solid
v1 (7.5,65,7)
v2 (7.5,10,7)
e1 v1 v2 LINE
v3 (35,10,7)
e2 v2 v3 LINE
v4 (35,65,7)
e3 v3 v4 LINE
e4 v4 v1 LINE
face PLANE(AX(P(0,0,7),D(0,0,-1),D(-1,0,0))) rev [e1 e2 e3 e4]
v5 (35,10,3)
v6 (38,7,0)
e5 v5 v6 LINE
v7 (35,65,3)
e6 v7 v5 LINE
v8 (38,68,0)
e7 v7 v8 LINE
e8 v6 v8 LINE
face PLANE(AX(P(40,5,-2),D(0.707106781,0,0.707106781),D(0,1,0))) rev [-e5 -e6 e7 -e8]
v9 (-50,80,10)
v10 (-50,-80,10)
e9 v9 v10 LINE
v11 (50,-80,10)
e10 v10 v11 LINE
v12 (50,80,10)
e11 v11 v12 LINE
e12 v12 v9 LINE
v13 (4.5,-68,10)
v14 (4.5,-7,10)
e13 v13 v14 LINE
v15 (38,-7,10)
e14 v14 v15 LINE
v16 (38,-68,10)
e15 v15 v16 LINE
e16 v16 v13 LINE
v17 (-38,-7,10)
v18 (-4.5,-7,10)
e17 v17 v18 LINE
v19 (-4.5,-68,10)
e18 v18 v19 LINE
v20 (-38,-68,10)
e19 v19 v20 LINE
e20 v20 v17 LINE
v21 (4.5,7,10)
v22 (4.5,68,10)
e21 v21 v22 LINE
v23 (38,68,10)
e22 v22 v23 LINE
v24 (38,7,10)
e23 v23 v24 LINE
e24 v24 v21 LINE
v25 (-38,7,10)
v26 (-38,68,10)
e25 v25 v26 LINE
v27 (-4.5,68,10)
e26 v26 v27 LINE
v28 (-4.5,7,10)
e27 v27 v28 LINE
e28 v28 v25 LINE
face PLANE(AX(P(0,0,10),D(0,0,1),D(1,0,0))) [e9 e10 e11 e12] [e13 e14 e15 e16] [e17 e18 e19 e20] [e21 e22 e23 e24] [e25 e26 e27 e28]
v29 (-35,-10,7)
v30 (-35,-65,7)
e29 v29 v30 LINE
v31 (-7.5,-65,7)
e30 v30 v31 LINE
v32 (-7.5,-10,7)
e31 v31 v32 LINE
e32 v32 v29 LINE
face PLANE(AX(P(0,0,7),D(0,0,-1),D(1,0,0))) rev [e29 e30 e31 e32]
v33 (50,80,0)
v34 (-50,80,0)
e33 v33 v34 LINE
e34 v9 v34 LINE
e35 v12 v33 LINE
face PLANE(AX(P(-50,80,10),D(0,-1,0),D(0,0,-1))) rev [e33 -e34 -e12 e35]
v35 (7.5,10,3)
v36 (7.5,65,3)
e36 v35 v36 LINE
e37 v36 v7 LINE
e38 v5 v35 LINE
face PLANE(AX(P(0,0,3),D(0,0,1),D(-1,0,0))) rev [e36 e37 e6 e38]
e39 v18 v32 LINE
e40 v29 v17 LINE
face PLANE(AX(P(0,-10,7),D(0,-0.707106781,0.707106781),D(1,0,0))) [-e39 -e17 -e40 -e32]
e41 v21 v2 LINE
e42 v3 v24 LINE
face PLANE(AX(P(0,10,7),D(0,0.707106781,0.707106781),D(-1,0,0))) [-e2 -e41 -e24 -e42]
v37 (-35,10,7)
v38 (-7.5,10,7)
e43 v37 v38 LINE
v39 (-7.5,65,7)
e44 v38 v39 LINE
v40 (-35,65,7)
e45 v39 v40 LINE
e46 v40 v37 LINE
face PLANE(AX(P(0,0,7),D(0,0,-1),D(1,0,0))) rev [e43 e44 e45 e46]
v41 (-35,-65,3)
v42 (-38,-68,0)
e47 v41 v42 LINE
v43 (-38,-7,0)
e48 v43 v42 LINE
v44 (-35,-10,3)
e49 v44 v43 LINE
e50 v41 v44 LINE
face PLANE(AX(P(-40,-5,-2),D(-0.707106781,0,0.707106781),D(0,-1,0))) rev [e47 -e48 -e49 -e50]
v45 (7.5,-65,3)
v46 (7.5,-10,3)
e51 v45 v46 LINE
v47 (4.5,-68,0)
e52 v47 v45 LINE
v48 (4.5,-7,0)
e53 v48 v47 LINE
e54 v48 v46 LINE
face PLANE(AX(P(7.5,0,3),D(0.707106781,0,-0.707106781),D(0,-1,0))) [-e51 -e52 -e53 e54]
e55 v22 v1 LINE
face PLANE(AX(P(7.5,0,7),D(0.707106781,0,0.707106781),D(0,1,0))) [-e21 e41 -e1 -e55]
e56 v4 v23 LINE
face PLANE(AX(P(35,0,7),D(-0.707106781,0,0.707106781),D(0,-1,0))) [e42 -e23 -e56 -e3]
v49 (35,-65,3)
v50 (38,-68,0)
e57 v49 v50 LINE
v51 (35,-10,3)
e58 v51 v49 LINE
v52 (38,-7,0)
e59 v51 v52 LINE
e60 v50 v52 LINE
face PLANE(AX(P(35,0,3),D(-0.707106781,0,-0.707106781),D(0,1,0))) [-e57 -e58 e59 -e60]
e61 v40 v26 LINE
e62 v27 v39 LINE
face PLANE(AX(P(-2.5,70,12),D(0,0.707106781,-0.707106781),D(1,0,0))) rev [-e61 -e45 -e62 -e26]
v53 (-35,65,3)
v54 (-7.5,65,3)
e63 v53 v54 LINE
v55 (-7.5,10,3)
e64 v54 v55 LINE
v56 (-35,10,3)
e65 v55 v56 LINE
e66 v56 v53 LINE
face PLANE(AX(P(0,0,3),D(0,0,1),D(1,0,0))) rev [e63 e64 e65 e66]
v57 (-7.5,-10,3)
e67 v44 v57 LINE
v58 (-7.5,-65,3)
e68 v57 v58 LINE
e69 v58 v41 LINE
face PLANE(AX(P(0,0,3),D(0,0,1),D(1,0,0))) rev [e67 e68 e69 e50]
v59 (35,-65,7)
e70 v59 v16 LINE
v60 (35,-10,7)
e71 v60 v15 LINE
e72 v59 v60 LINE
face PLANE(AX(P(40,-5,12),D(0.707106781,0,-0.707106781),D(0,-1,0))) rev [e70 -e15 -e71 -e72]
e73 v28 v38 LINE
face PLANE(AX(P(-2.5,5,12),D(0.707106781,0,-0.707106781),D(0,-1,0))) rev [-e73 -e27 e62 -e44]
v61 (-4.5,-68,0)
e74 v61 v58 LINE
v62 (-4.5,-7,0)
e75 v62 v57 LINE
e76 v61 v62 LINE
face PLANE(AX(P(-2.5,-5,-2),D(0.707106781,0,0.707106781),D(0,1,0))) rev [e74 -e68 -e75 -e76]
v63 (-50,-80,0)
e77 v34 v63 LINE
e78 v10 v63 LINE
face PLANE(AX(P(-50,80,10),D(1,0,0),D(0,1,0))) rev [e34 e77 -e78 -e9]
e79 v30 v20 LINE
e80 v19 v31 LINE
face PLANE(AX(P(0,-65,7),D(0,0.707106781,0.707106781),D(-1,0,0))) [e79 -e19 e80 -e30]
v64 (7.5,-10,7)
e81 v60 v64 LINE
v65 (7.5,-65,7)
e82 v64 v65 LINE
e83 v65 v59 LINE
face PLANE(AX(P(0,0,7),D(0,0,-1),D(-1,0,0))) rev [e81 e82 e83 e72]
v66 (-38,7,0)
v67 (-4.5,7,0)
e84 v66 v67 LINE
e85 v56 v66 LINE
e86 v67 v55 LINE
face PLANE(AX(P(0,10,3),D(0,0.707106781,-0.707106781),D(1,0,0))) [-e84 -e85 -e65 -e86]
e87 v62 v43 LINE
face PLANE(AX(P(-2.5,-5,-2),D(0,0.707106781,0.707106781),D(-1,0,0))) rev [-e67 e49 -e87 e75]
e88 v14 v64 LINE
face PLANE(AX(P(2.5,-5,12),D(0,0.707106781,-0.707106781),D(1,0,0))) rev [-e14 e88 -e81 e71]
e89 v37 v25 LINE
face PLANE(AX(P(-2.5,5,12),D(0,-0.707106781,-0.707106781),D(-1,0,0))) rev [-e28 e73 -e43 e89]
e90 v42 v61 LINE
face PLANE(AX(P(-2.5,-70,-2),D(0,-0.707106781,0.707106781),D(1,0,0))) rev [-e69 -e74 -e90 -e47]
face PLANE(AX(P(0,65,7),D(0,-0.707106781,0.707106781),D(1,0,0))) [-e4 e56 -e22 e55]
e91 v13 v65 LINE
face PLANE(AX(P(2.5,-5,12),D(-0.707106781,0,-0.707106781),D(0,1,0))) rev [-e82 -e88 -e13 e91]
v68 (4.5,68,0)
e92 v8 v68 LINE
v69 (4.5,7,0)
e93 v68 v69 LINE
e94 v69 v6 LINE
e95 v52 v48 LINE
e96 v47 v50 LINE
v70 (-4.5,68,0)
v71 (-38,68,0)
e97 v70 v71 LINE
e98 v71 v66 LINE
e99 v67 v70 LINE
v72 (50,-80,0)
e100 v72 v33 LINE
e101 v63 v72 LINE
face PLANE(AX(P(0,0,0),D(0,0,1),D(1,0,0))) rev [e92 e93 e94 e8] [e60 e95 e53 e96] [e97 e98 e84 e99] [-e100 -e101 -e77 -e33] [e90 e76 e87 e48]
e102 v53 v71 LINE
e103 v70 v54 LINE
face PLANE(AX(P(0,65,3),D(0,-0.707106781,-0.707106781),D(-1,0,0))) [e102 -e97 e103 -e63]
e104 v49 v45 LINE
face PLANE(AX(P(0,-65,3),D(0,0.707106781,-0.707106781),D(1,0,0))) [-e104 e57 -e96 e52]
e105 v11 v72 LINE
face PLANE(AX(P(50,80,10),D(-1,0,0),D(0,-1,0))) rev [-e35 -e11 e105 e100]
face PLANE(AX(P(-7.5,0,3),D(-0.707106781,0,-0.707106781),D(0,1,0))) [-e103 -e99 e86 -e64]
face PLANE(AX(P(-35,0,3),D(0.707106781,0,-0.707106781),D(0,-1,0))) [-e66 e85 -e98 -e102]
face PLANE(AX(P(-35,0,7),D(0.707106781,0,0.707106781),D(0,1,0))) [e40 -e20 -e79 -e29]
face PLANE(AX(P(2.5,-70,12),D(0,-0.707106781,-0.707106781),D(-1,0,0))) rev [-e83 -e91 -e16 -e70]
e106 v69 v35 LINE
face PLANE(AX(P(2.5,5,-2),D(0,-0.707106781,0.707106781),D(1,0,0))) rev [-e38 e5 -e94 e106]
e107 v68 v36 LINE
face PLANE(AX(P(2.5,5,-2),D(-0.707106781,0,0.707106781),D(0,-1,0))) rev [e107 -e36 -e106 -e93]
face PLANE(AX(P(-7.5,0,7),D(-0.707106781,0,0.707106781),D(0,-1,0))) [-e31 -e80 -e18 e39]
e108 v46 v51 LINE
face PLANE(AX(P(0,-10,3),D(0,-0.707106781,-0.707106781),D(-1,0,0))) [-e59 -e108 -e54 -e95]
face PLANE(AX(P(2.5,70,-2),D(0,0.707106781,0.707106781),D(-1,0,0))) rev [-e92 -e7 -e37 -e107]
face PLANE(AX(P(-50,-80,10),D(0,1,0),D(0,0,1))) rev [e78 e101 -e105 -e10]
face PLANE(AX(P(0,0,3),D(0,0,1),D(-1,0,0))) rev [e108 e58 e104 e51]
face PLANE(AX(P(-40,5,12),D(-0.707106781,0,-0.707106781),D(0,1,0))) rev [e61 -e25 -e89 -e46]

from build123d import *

# Parameters (mm, degrees)
SKETCH1_W               = 100
SKETCH1_H               = 160
BOSS_EXTRUDE1_DEPTH     = 10
SKETCH2_W               = 37.5
SKETCH2_H               = 65
CUT_EXTRUDE1_DEPTH      = 3
MIRROR6_COPY_1_SKETCH_W = 37.5
MIRROR6_COPY_1_SKETCH_H = 65
MIRROR6_COPY_1_DEPTH    = 3
MIRROR7_COPY_1_SKETCH_W = 37.5
MIRROR7_COPY_1_SKETCH_H = 65
MIRROR7_COPY_1_DEPTH    = 3
MIRROR7_COPY_2_SKETCH_W = 37.5
MIRROR7_COPY_2_SKETCH_H = 65
MIRROR7_COPY_2_DEPTH    = 3
MIRROR7_COPY_3_SKETCH_W = 37.5
MIRROR7_COPY_3_SKETCH_H = 65
MIRROR7_COPY_3_DEPTH    = 3
CHAMFER2_SIZE           = 5


with BuildPart() as part:
    # Sketch1 → Boss-Extrude1 (new body)
    with BuildSketch(Plane.XY):
        Rectangle(SKETCH1_W, SKETCH1_H)
    extrude(amount=BOSS_EXTRUDE1_DEPTH)

    # Sketch2 → Cut-Extrude1 (cut)
    with BuildSketch(Plane.XY.offset(10)):
        with Locations((21.25, 37.5)):
            Rectangle(SKETCH2_W, SKETCH2_H)
    cut_extrude1 = extrude(amount=-CUT_EXTRUDE1_DEPTH, mode=Mode.SUBTRACT)

    # Mirror5: Cut-Extrude1 across plane
    add(cut_extrude1.mirror(Plane.ZX), mode=Mode.SUBTRACT)

    # Mirror6: Cut-Extrude1 across plane
    add(cut_extrude1.mirror(Plane(origin=(0, 0, 0), x_dir=(0, 0, 1), z_dir=(1, 0, 0))), mode=Mode.SUBTRACT)

    # Mirror6 copy 1 sketch → Mirror6 copy 1 (cut)
    with BuildSketch(Plane(origin=(0, 0, 10), x_dir=(-1, 0, 0), z_dir=(0, 0, 1))):
        with Locations((21.25, 37.5)):
            Rectangle(MIRROR6_COPY_1_SKETCH_W, MIRROR6_COPY_1_SKETCH_H)
    extrude(amount=-MIRROR6_COPY_1_DEPTH, mode=Mode.SUBTRACT)

    # Mirror7: Cut-Extrude1 across plane
    add(cut_extrude1.mirror(Plane.XY.offset(5)), mode=Mode.SUBTRACT)

    # Mirror7 copy 1 sketch → Mirror7 copy 1 (cut)
    with BuildSketch(Plane(origin=(0, 0, 0), x_dir=(1, 0, 0), z_dir=(0, 0, -1))):
        with Locations((21.25, 37.5)):
            Rectangle(MIRROR7_COPY_1_SKETCH_W, MIRROR7_COPY_1_SKETCH_H)
    extrude(amount=-MIRROR7_COPY_1_DEPTH, mode=Mode.SUBTRACT)

    # Mirror7 copy 2 sketch → Mirror7 copy 2 (cut)
    with BuildSketch(Plane(origin=(0, 0, 0), x_dir=(-1, 0, 0), z_dir=(0, 0, -1))):
        with Locations((21.25, 37.5)):
            Rectangle(MIRROR7_COPY_2_SKETCH_W, MIRROR7_COPY_2_SKETCH_H)
    extrude(amount=-MIRROR7_COPY_2_DEPTH, mode=Mode.SUBTRACT)

    # Mirror7 copy 3 sketch → Mirror7 copy 3 (cut)
    with BuildSketch(Plane(origin=(0, 0, 0), x_dir=(-1, 0, 0), z_dir=(0, 0, -1))):
        with Locations((21.25, -37.5)):
            Rectangle(MIRROR7_COPY_3_SKETCH_W, MIRROR7_COPY_3_SKETCH_H)
    extrude(amount=-MIRROR7_COPY_3_DEPTH, mode=Mode.SUBTRACT)

    # Chamfer2
    # the kernel refuses this chamfer: 5 mm, written as the material it adds along each edge
    with BuildSketch(Plane(origin=(10.35841494, -5, 3), x_dir=(0, 0.027495876610586317, -0.9996219169112968), z_dir=(-1, 0, 0))) as chamfer2_piece_1_section:
        Polygon((CHAMFER2_SIZE * 0.999621916911, CHAMFER2_SIZE * 0.0274958766106), (-CHAMFER2_SIZE * 0.0274958766106, CHAMFER2_SIZE * 0.999621916911), (0, 0), align=None)
    chamfer2_piece_1 = extrude(amount=50.35841494, mode=Mode.PRIVATE)
    chamfer2_piece_1 = split(chamfer2_piece_1, bisect_by=Plane(origin=(6.42920747, -6.857142857, 0), z_dir=(0, 0, 1)), keep=Keep.TOP, mode=Mode.PRIVATE)
    add(chamfer2_piece_1)
    with BuildSketch(Plane(origin=(-40, 7.85841494, 3), x_dir=(-0.027495876610586317, 0, -0.9996219169112968), z_dir=(0, -1, 0))) as chamfer2_piece_2_section:
        Polygon((CHAMFER2_SIZE * 0.999621916911, CHAMFER2_SIZE * 0.0274958766106), (-CHAMFER2_SIZE * 0.0274958766106, CHAMFER2_SIZE * 0.999621916911), (0, 0), align=None)
    chamfer2_piece_2 = extrude(amount=77.85841494, mode=Mode.PRIVATE)
    chamfer2_piece_2 = split(chamfer2_piece_2, bisect_by=Plane(origin=(-38.142857143, 6.42920747, 0), z_dir=(0, 0, 1)), keep=Keep.TOP, mode=Mode.PRIVATE)
    add(chamfer2_piece_2)
    with BuildSketch(Plane(origin=(-40, -70, 3), x_dir=(0, -0.0274958766105877, -0.9996219169112968), z_dir=(1, 0, 0))) as chamfer2_piece_3_section:
        Polygon((CHAMFER2_SIZE * 0.999621916911, CHAMFER2_SIZE * 0.0274958766106), (-CHAMFER2_SIZE * 0.0274958766106, CHAMFER2_SIZE * 0.999621916911), (0, 0), align=None)
    chamfer2_piece_3 = extrude(amount=50.35841494, mode=Mode.PRIVATE)
    chamfer2_piece_3 = split(chamfer2_piece_3, bisect_by=Plane(origin=(-21.25, -68.142857143, 0), z_dir=(0, 0, 1)), keep=Keep.TOP, mode=Mode.PRIVATE)
    add(chamfer2_piece_3)
    with BuildSketch(Plane(origin=(-2.5, -70, 3), x_dir=(0.027495876610586403, 0, -0.9996219169112968), z_dir=(0, 1, 0))) as chamfer2_piece_4_section:
        Polygon((CHAMFER2_SIZE * 0.999621916911, CHAMFER2_SIZE * 0.0274958766106), (-CHAMFER2_SIZE * 0.0274958766106, CHAMFER2_SIZE * 0.999621916911), (0, 0), align=None)
    chamfer2_piece_4 = extrude(amount=77.85841494, mode=Mode.PRIVATE)
    chamfer2_piece_4 = split(chamfer2_piece_4, bisect_by=Plane(origin=(-4.357142857, -37.5, 0), z_dir=(0, 0, 1)), keep=Keep.TOP, mode=Mode.PRIVATE)
    add(chamfer2_piece_4)
    with BuildSketch(Plane(origin=(-40, -70, 7), x_dir=(0, -0.0274958766105877, 0.9996219169112968), z_dir=(1, 0, 0))) as chamfer2_piece_5_section:
        Polygon((CHAMFER2_SIZE * 0.999621916911, -CHAMFER2_SIZE * 0.0274958766106), (-CHAMFER2_SIZE * 0.0274958766106, -CHAMFER2_SIZE * 0.999621916911), (0, 0), align=None)
    chamfer2_piece_5 = extrude(amount=50.35841494, mode=Mode.PRIVATE)
    chamfer2_piece_5 = split(chamfer2_piece_5, bisect_by=Plane(origin=(-21.25, -68.142857143, 10), z_dir=(0, 0, -1)), keep=Keep.TOP, mode=Mode.PRIVATE)
    add(chamfer2_piece_5)
    with BuildSketch(Plane(origin=(-40, 7.85841494, 7), x_dir=(-0.027495876610586317, 0, 0.9996219169112968), z_dir=(0, -1, 0))) as chamfer2_piece_6_section:
        Polygon((CHAMFER2_SIZE * 0.999621916911, -CHAMFER2_SIZE * 0.0274958766106), (-CHAMFER2_SIZE * 0.0274958766106, -CHAMFER2_SIZE * 0.999621916911), (0, 0), align=None)
    chamfer2_piece_6 = extrude(amount=77.85841494, mode=Mode.PRIVATE)
    chamfer2_piece_6 = split(chamfer2_piece_6, bisect_by=Plane(origin=(-38.142857143, 6.42920747, 10), z_dir=(0, 0, -1)), keep=Keep.TOP, mode=Mode.PRIVATE)
    add(chamfer2_piece_6)
    with BuildSketch(Plane(origin=(10.35841494, -5, 7), x_dir=(0, 0.027495876610586317, 0.9996219169112968), z_dir=(-1, 0, 0))) as chamfer2_piece_7_section:
        Polygon((CHAMFER2_SIZE * 0.999621916911, -CHAMFER2_SIZE * 0.0274958766106), (-CHAMFER2_SIZE * 0.0274958766106, -CHAMFER2_SIZE * 0.999621916911), (0, 0), align=None)
    chamfer2_piece_7 = extrude(amount=50.35841494, mode=Mode.PRIVATE)
    chamfer2_piece_7 = split(chamfer2_piece_7, bisect_by=Plane(origin=(6.42920747, -6.857142857, 10), z_dir=(0, 0, -1)), keep=Keep.TOP, mode=Mode.PRIVATE)
    add(chamfer2_piece_7)
    with BuildSketch(Plane(origin=(-2.5, -70, 7), x_dir=(0.027495876610586403, 0, 0.9996219169112968), z_dir=(0, 1, 0))) as chamfer2_piece_8_section:
        Polygon((CHAMFER2_SIZE * 0.999621916911, -CHAMFER2_SIZE * 0.0274958766106), (-CHAMFER2_SIZE * 0.0274958766106, -CHAMFER2_SIZE * 0.999621916911), (0, 0), align=None)
    chamfer2_piece_8 = extrude(amount=77.85841494, mode=Mode.PRIVATE)
    chamfer2_piece_8 = split(chamfer2_piece_8, bisect_by=Plane(origin=(-4.357142857, -37.5, 10), z_dir=(0, 0, -1)), keep=Keep.TOP, mode=Mode.PRIVATE)
    add(chamfer2_piece_8)
    with BuildSketch(Plane(origin=(-10.35841494, 5, 3), x_dir=(0, -0.027495876610586317, -0.9996219169112968), z_dir=(1, 0, 0))) as chamfer2_piece_9_section:
        Polygon((CHAMFER2_SIZE * 0.999621916911, CHAMFER2_SIZE * 0.0274958766106), (-CHAMFER2_SIZE * 0.0274958766106, CHAMFER2_SIZE * 0.999621916911), (0, 0), align=None)
    chamfer2_piece_9 = extrude(amount=50.35841494, mode=Mode.PRIVATE)
    chamfer2_piece_9 = split(chamfer2_piece_9, bisect_by=Plane(origin=(-6.42920747, 6.857142857, 0), z_dir=(0, 0, 1)), keep=Keep.TOP, mode=Mode.PRIVATE)
    add(chamfer2_piece_9)
    with BuildSketch(Plane(origin=(40, -7.85841494, 3), x_dir=(0.027495876610586317, 0, -0.9996219169112968), z_dir=(0, 1, 0))) as chamfer2_piece_10_section:
        Polygon((CHAMFER2_SIZE * 0.999621916911, CHAMFER2_SIZE * 0.0274958766106), (-CHAMFER2_SIZE * 0.0274958766106, CHAMFER2_SIZE * 0.999621916911), (0, 0), align=None)
    chamfer2_piece_10 = extrude(amount=77.85841494, mode=Mode.PRIVATE)
    chamfer2_piece_10 = split(chamfer2_piece_10, bisect_by=Plane(origin=(38.142857143, -6.42920747, 0), z_dir=(0, 0, 1)), keep=Keep.TOP, mode=Mode.PRIVATE)
    add(chamfer2_piece_10)
    with BuildSketch(Plane(origin=(40, 70, 3), x_dir=(0, 0.0274958766105877, -0.9996219169112968), z_dir=(-1, 0, 0))) as chamfer2_piece_11_section:
        Polygon((CHAMFER2_SIZE * 0.999621916911, CHAMFER2_SIZE * 0.0274958766106), (-CHAMFER2_SIZE * 0.0274958766106, CHAMFER2_SIZE * 0.999621916911), (0, 0), align=None)
    chamfer2_piece_11 = extrude(amount=50.35841494, mode=Mode.PRIVATE)
    chamfer2_piece_11 = split(chamfer2_piece_11, bisect_by=Plane(origin=(21.25, 68.142857143, 0), z_dir=(0, 0, 1)), keep=Keep.TOP, mode=Mode.PRIVATE)
    add(chamfer2_piece_11)
    with BuildSketch(Plane(origin=(2.5, 70, 3), x_dir=(-0.027495876610586403, 0, -0.9996219169112968), z_dir=(0, -1, 0))) as chamfer2_piece_12_section:
        Polygon((CHAMFER2_SIZE * 0.999621916911, CHAMFER2_SIZE * 0.0274958766106), (-CHAMFER2_SIZE * 0.0274958766106, CHAMFER2_SIZE * 0.999621916911), (0, 0), align=None)
    chamfer2_piece_12 = extrude(amount=77.85841494, mode=Mode.PRIVATE)
    chamfer2_piece_12 = split(chamfer2_piece_12, bisect_by=Plane(origin=(4.357142857, 37.5, 0), z_dir=(0, 0, 1)), keep=Keep.TOP, mode=Mode.PRIVATE)
    add(chamfer2_piece_12)
    with BuildSketch(Plane(origin=(-40, 70, 3), x_dir=(0, 0.0274958766105877, -0.9996219169112968), z_dir=(1, 0, 0))) as chamfer2_piece_13_section:
        Polygon((CHAMFER2_SIZE * 0.999621916911, -CHAMFER2_SIZE * 0.0274958766106), (-CHAMFER2_SIZE * 0.0274958766106, -CHAMFER2_SIZE * 0.999621916911), (0, 0), align=None)
    chamfer2_piece_13 = extrude(amount=50.35841494, mode=Mode.PRIVATE)
    chamfer2_piece_13 = split(chamfer2_piece_13, bisect_by=Plane(origin=(-21.25, 68.142857143, 0), z_dir=(0, 0, 1)), keep=Keep.TOP, mode=Mode.PRIVATE)
    add(chamfer2_piece_13)
    with BuildSketch(Plane(origin=(-40, -7.85841494, 3), x_dir=(-0.027495876610586317, 0, -0.9996219169112968), z_dir=(0, 1, 0))) as chamfer2_piece_14_section:
        Polygon((CHAMFER2_SIZE * 0.999621916911, -CHAMFER2_SIZE * 0.0274958766106), (-CHAMFER2_SIZE * 0.0274958766106, -CHAMFER2_SIZE * 0.999621916911), (0, 0), align=None)
    chamfer2_piece_14 = extrude(amount=77.85841494, mode=Mode.PRIVATE)
    chamfer2_piece_14 = split(chamfer2_piece_14, bisect_by=Plane(origin=(-38.142857143, -6.42920747, 0), z_dir=(0, 0, 1)), keep=Keep.TOP, mode=Mode.PRIVATE)
    add(chamfer2_piece_14)
    with BuildSketch(Plane(origin=(10.35841494, 5, 3), x_dir=(0, -0.027495876610586317, -0.9996219169112968), z_dir=(-1, 0, 0))) as chamfer2_piece_15_section:
        Polygon((CHAMFER2_SIZE * 0.999621916911, -CHAMFER2_SIZE * 0.0274958766106), (-CHAMFER2_SIZE * 0.0274958766106, -CHAMFER2_SIZE * 0.999621916911), (0, 0), align=None)
    chamfer2_piece_15 = extrude(amount=50.35841494, mode=Mode.PRIVATE)
    chamfer2_piece_15 = split(chamfer2_piece_15, bisect_by=Plane(origin=(6.42920747, 6.857142857, 0), z_dir=(0, 0, 1)), keep=Keep.TOP, mode=Mode.PRIVATE)
    add(chamfer2_piece_15)
    with BuildSketch(Plane(origin=(-2.5, 70, 3), x_dir=(0.027495876610586403, 0, -0.9996219169112968), z_dir=(0, -1, 0))) as chamfer2_piece_16_section:
        Polygon((CHAMFER2_SIZE * 0.999621916911, -CHAMFER2_SIZE * 0.0274958766106), (-CHAMFER2_SIZE * 0.0274958766106, -CHAMFER2_SIZE * 0.999621916911), (0, 0), align=None)
    chamfer2_piece_16 = extrude(amount=77.85841494, mode=Mode.PRIVATE)
    chamfer2_piece_16 = split(chamfer2_piece_16, bisect_by=Plane(origin=(-4.357142857, 37.5, 0), z_dir=(0, 0, 1)), keep=Keep.TOP, mode=Mode.PRIVATE)
    add(chamfer2_piece_16)
    with BuildSketch(Plane(origin=(40, -70, 3), x_dir=(0, -0.0274958766105877, -0.9996219169112968), z_dir=(-1, 0, 0))) as chamfer2_piece_17_section:
        Polygon((CHAMFER2_SIZE * 0.999621916911, -CHAMFER2_SIZE * 0.0274958766106), (-CHAMFER2_SIZE * 0.0274958766106, -CHAMFER2_SIZE * 0.999621916911), (0, 0), align=None)
    chamfer2_piece_17 = extrude(amount=50.35841494, mode=Mode.PRIVATE)
    chamfer2_piece_17 = split(chamfer2_piece_17, bisect_by=Plane(origin=(21.25, -68.142857143, 0), z_dir=(0, 0, 1)), keep=Keep.TOP, mode=Mode.PRIVATE)
    add(chamfer2_piece_17)
    with BuildSketch(Plane(origin=(40, 7.85841494, 3), x_dir=(0.027495876610586317, 0, -0.9996219169112968), z_dir=(0, -1, 0))) as chamfer2_piece_18_section:
        Polygon((CHAMFER2_SIZE * 0.999621916911, -CHAMFER2_SIZE * 0.0274958766106), (-CHAMFER2_SIZE * 0.0274958766106, -CHAMFER2_SIZE * 0.999621916911), (0, 0), align=None)
    chamfer2_piece_18 = extrude(amount=77.85841494, mode=Mode.PRIVATE)
    chamfer2_piece_18 = split(chamfer2_piece_18, bisect_by=Plane(origin=(38.142857143, 6.42920747, 0), z_dir=(0, 0, 1)), keep=Keep.TOP, mode=Mode.PRIVATE)
    add(chamfer2_piece_18)
    with BuildSketch(Plane(origin=(-10.35841494, -5, 3), x_dir=(0, 0.027495876610586317, -0.9996219169112968), z_dir=(1, 0, 0))) as chamfer2_piece_19_section:
        Polygon((CHAMFER2_SIZE * 0.999621916911, -CHAMFER2_SIZE * 0.0274958766106), (-CHAMFER2_SIZE * 0.0274958766106, -CHAMFER2_SIZE * 0.999621916911), (0, 0), align=None)
    chamfer2_piece_19 = extrude(amount=50.35841494, mode=Mode.PRIVATE)
    chamfer2_piece_19 = split(chamfer2_piece_19, bisect_by=Plane(origin=(-6.42920747, -6.857142857, 0), z_dir=(0, 0, 1)), keep=Keep.TOP, mode=Mode.PRIVATE)
    add(chamfer2_piece_19)
    with BuildSketch(Plane(origin=(2.5, -70, 3), x_dir=(-0.027495876610586403, 0, -0.9996219169112968), z_dir=(0, 1, 0))) as chamfer2_piece_20_section:
        Polygon((CHAMFER2_SIZE * 0.999621916911, -CHAMFER2_SIZE * 0.0274958766106), (-CHAMFER2_SIZE * 0.0274958766106, -CHAMFER2_SIZE * 0.999621916911), (0, 0), align=None)
    chamfer2_piece_20 = extrude(amount=77.85841494, mode=Mode.PRIVATE)
    chamfer2_piece_20 = split(chamfer2_piece_20, bisect_by=Plane(origin=(4.357142857, -37.5, 0), z_dir=(0, 0, 1)), keep=Keep.TOP, mode=Mode.PRIVATE)
    add(chamfer2_piece_20)
    with BuildSketch(Plane(origin=(-10.35841494, -5, 7), x_dir=(0, 0.027495876610586317, 0.9996219169112968), z_dir=(1, 0, 0))) as chamfer2_piece_21_section:
        Polygon((CHAMFER2_SIZE * 0.999621916911, CHAMFER2_SIZE * 0.0274958766106), (-CHAMFER2_SIZE * 0.0274958766106, CHAMFER2_SIZE * 0.999621916911), (0, 0), align=None)
    chamfer2_piece_21 = extrude(amount=50.35841494, mode=Mode.PRIVATE)
    chamfer2_piece_21 = split(chamfer2_piece_21, bisect_by=Plane(origin=(-6.42920747, -6.857142857, 10), z_dir=(0, 0, -1)), keep=Keep.TOP, mode=Mode.PRIVATE)
    add(chamfer2_piece_21)
    with BuildSketch(Plane(origin=(40, 7.85841494, 7), x_dir=(0.027495876610586317, 0, 0.9996219169112968), z_dir=(0, -1, 0))) as chamfer2_piece_22_section:
        Polygon((CHAMFER2_SIZE * 0.999621916911, CHAMFER2_SIZE * 0.0274958766106), (-CHAMFER2_SIZE * 0.0274958766106, CHAMFER2_SIZE * 0.999621916911), (0, 0), align=None)
    chamfer2_piece_22 = extrude(amount=77.85841494, mode=Mode.PRIVATE)
    chamfer2_piece_22 = split(chamfer2_piece_22, bisect_by=Plane(origin=(38.142857143, 6.42920747, 10), z_dir=(0, 0, -1)), keep=Keep.TOP, mode=Mode.PRIVATE)
    add(chamfer2_piece_22)
    with BuildSketch(Plane(origin=(40, -70, 7), x_dir=(0, -0.0274958766105877, 0.9996219169112968), z_dir=(-1, 0, 0))) as chamfer2_piece_23_section:
        Polygon((CHAMFER2_SIZE * 0.999621916911, CHAMFER2_SIZE * 0.0274958766106), (-CHAMFER2_SIZE * 0.0274958766106, CHAMFER2_SIZE * 0.999621916911), (0, 0), align=None)
    chamfer2_piece_23 = extrude(amount=50.35841494, mode=Mode.PRIVATE)
    chamfer2_piece_23 = split(chamfer2_piece_23, bisect_by=Plane(origin=(21.25, -68.142857143, 10), z_dir=(0, 0, -1)), keep=Keep.TOP, mode=Mode.PRIVATE)
    add(chamfer2_piece_23)
    with BuildSketch(Plane(origin=(2.5, -70, 7), x_dir=(-0.027495876610586403, 0, 0.9996219169112968), z_dir=(0, 1, 0))) as chamfer2_piece_24_section:
        Polygon((CHAMFER2_SIZE * 0.999621916911, CHAMFER2_SIZE * 0.0274958766106), (-CHAMFER2_SIZE * 0.0274958766106, CHAMFER2_SIZE * 0.999621916911), (0, 0), align=None)
    chamfer2_piece_24 = extrude(amount=77.85841494, mode=Mode.PRIVATE)
    chamfer2_piece_24 = split(chamfer2_piece_24, bisect_by=Plane(origin=(4.357142857, -37.5, 10), z_dir=(0, 0, -1)), keep=Keep.TOP, mode=Mode.PRIVATE)
    add(chamfer2_piece_24)
    with BuildSketch(Plane(origin=(40, 70, 7), x_dir=(0, 0.0274958766105877, 0.9996219169112968), z_dir=(-1, 0, 0))) as chamfer2_piece_25_section:
        Polygon((CHAMFER2_SIZE * 0.999621916911, -CHAMFER2_SIZE * 0.0274958766106), (-CHAMFER2_SIZE * 0.0274958766106, -CHAMFER2_SIZE * 0.999621916911), (0, 0), align=None)
    chamfer2_piece_25 = extrude(amount=50.35841494, mode=Mode.PRIVATE)
    chamfer2_piece_25 = split(chamfer2_piece_25, bisect_by=Plane(origin=(21.25, 68.142857143, 10), z_dir=(0, 0, -1)), keep=Keep.TOP, mode=Mode.PRIVATE)
    add(chamfer2_piece_25)
    with BuildSketch(Plane(origin=(40, -7.85841494, 7), x_dir=(0.027495876610586317, 0, 0.9996219169112968), z_dir=(0, 1, 0))) as chamfer2_piece_26_section:
        Polygon((CHAMFER2_SIZE * 0.999621916911, -CHAMFER2_SIZE * 0.0274958766106), (-CHAMFER2_SIZE * 0.0274958766106, -CHAMFER2_SIZE * 0.999621916911), (0, 0), align=None)
    chamfer2_piece_26 = extrude(amount=77.85841494, mode=Mode.PRIVATE)
    chamfer2_piece_26 = split(chamfer2_piece_26, bisect_by=Plane(origin=(38.142857143, -6.42920747, 10), z_dir=(0, 0, -1)), keep=Keep.TOP, mode=Mode.PRIVATE)
    add(chamfer2_piece_26)
    with BuildSketch(Plane(origin=(-10.35841494, 5, 7), x_dir=(0, -0.027495876610586317, 0.9996219169112968), z_dir=(1, 0, 0))) as chamfer2_piece_27_section:
        Polygon((CHAMFER2_SIZE * 0.999621916911, -CHAMFER2_SIZE * 0.0274958766106), (-CHAMFER2_SIZE * 0.0274958766106, -CHAMFER2_SIZE * 0.999621916911), (0, 0), align=None)
    chamfer2_piece_27 = extrude(amount=50.35841494, mode=Mode.PRIVATE)
    chamfer2_piece_27 = split(chamfer2_piece_27, bisect_by=Plane(origin=(-6.42920747, 6.857142857, 10), z_dir=(0, 0, -1)), keep=Keep.TOP, mode=Mode.PRIVATE)
    add(chamfer2_piece_27)
    with BuildSketch(Plane(origin=(2.5, 70, 7), x_dir=(-0.027495876610586403, 0, 0.9996219169112968), z_dir=(0, -1, 0))) as chamfer2_piece_28_section:
        Polygon((CHAMFER2_SIZE * 0.999621916911, -CHAMFER2_SIZE * 0.0274958766106), (-CHAMFER2_SIZE * 0.0274958766106, -CHAMFER2_SIZE * 0.999621916911), (0, 0), align=None)
    chamfer2_piece_28 = extrude(amount=77.85841494, mode=Mode.PRIVATE)
    chamfer2_piece_28 = split(chamfer2_piece_28, bisect_by=Plane(origin=(4.357142857, 37.5, 10), z_dir=(0, 0, -1)), keep=Keep.TOP, mode=Mode.PRIVATE)
    add(chamfer2_piece_28)
    with BuildSketch(Plane(origin=(10.35841494, 5, 7), x_dir=(0, -0.027495876610586317, 0.9996219169112968), z_dir=(-1, 0, 0))) as chamfer2_piece_29_section:
        Polygon((CHAMFER2_SIZE * 0.999621916911, CHAMFER2_SIZE * 0.0274958766106), (-CHAMFER2_SIZE * 0.0274958766106, CHAMFER2_SIZE * 0.999621916911), (0, 0), align=None)
    chamfer2_piece_29 = extrude(amount=50.35841494, mode=Mode.PRIVATE)
    chamfer2_piece_29 = split(chamfer2_piece_29, bisect_by=Plane(origin=(6.42920747, 6.857142857, 10), z_dir=(0, 0, -1)), keep=Keep.TOP, mode=Mode.PRIVATE)
    add(chamfer2_piece_29)
    with BuildSketch(Plane(origin=(-40, -7.85841494, 7), x_dir=(-0.027495876610586317, 0, 0.9996219169112968), z_dir=(0, 1, 0))) as chamfer2_piece_30_section:
        Polygon((CHAMFER2_SIZE * 0.999621916911, CHAMFER2_SIZE * 0.0274958766106), (-CHAMFER2_SIZE * 0.0274958766106, CHAMFER2_SIZE * 0.999621916911), (0, 0), align=None)
    chamfer2_piece_30 = extrude(amount=77.85841494, mode=Mode.PRIVATE)
    chamfer2_piece_30 = split(chamfer2_piece_30, bisect_by=Plane(origin=(-38.142857143, -6.42920747, 10), z_dir=(0, 0, -1)), keep=Keep.TOP, mode=Mode.PRIVATE)
    add(chamfer2_piece_30)
    with BuildSketch(Plane(origin=(-40, 70, 7), x_dir=(0, 0.0274958766105877, 0.9996219169112968), z_dir=(1, 0, 0))) as chamfer2_piece_31_section:
        Polygon((CHAMFER2_SIZE * 0.999621916911, CHAMFER2_SIZE * 0.0274958766106), (-CHAMFER2_SIZE * 0.0274958766106, CHAMFER2_SIZE * 0.999621916911), (0, 0), align=None)
    chamfer2_piece_31 = extrude(amount=50.35841494, mode=Mode.PRIVATE)
    chamfer2_piece_31 = split(chamfer2_piece_31, bisect_by=Plane(origin=(-21.25, 68.142857143, 10), z_dir=(0, 0, -1)), keep=Keep.TOP, mode=Mode.PRIVATE)
    add(chamfer2_piece_31)
    with BuildSketch(Plane(origin=(-2.5, 70, 7), x_dir=(0.027495876610586403, 0, 0.9996219169112968), z_dir=(0, -1, 0))) as chamfer2_piece_32_section:
        Polygon((CHAMFER2_SIZE * 0.999621916911, CHAMFER2_SIZE * 0.0274958766106), (-CHAMFER2_SIZE * 0.0274958766106, CHAMFER2_SIZE * 0.999621916911), (0, 0), align=None)
    chamfer2_piece_32 = extrude(amount=77.85841494, mode=Mode.PRIVATE)
    chamfer2_piece_32 = split(chamfer2_piece_32, bisect_by=Plane(origin=(-4.357142857, 37.5, 10), z_dir=(0, 0, -1)), keep=Keep.TOP, mode=Mode.PRIVATE)
    add(chamfer2_piece_32)


solid = part.part
